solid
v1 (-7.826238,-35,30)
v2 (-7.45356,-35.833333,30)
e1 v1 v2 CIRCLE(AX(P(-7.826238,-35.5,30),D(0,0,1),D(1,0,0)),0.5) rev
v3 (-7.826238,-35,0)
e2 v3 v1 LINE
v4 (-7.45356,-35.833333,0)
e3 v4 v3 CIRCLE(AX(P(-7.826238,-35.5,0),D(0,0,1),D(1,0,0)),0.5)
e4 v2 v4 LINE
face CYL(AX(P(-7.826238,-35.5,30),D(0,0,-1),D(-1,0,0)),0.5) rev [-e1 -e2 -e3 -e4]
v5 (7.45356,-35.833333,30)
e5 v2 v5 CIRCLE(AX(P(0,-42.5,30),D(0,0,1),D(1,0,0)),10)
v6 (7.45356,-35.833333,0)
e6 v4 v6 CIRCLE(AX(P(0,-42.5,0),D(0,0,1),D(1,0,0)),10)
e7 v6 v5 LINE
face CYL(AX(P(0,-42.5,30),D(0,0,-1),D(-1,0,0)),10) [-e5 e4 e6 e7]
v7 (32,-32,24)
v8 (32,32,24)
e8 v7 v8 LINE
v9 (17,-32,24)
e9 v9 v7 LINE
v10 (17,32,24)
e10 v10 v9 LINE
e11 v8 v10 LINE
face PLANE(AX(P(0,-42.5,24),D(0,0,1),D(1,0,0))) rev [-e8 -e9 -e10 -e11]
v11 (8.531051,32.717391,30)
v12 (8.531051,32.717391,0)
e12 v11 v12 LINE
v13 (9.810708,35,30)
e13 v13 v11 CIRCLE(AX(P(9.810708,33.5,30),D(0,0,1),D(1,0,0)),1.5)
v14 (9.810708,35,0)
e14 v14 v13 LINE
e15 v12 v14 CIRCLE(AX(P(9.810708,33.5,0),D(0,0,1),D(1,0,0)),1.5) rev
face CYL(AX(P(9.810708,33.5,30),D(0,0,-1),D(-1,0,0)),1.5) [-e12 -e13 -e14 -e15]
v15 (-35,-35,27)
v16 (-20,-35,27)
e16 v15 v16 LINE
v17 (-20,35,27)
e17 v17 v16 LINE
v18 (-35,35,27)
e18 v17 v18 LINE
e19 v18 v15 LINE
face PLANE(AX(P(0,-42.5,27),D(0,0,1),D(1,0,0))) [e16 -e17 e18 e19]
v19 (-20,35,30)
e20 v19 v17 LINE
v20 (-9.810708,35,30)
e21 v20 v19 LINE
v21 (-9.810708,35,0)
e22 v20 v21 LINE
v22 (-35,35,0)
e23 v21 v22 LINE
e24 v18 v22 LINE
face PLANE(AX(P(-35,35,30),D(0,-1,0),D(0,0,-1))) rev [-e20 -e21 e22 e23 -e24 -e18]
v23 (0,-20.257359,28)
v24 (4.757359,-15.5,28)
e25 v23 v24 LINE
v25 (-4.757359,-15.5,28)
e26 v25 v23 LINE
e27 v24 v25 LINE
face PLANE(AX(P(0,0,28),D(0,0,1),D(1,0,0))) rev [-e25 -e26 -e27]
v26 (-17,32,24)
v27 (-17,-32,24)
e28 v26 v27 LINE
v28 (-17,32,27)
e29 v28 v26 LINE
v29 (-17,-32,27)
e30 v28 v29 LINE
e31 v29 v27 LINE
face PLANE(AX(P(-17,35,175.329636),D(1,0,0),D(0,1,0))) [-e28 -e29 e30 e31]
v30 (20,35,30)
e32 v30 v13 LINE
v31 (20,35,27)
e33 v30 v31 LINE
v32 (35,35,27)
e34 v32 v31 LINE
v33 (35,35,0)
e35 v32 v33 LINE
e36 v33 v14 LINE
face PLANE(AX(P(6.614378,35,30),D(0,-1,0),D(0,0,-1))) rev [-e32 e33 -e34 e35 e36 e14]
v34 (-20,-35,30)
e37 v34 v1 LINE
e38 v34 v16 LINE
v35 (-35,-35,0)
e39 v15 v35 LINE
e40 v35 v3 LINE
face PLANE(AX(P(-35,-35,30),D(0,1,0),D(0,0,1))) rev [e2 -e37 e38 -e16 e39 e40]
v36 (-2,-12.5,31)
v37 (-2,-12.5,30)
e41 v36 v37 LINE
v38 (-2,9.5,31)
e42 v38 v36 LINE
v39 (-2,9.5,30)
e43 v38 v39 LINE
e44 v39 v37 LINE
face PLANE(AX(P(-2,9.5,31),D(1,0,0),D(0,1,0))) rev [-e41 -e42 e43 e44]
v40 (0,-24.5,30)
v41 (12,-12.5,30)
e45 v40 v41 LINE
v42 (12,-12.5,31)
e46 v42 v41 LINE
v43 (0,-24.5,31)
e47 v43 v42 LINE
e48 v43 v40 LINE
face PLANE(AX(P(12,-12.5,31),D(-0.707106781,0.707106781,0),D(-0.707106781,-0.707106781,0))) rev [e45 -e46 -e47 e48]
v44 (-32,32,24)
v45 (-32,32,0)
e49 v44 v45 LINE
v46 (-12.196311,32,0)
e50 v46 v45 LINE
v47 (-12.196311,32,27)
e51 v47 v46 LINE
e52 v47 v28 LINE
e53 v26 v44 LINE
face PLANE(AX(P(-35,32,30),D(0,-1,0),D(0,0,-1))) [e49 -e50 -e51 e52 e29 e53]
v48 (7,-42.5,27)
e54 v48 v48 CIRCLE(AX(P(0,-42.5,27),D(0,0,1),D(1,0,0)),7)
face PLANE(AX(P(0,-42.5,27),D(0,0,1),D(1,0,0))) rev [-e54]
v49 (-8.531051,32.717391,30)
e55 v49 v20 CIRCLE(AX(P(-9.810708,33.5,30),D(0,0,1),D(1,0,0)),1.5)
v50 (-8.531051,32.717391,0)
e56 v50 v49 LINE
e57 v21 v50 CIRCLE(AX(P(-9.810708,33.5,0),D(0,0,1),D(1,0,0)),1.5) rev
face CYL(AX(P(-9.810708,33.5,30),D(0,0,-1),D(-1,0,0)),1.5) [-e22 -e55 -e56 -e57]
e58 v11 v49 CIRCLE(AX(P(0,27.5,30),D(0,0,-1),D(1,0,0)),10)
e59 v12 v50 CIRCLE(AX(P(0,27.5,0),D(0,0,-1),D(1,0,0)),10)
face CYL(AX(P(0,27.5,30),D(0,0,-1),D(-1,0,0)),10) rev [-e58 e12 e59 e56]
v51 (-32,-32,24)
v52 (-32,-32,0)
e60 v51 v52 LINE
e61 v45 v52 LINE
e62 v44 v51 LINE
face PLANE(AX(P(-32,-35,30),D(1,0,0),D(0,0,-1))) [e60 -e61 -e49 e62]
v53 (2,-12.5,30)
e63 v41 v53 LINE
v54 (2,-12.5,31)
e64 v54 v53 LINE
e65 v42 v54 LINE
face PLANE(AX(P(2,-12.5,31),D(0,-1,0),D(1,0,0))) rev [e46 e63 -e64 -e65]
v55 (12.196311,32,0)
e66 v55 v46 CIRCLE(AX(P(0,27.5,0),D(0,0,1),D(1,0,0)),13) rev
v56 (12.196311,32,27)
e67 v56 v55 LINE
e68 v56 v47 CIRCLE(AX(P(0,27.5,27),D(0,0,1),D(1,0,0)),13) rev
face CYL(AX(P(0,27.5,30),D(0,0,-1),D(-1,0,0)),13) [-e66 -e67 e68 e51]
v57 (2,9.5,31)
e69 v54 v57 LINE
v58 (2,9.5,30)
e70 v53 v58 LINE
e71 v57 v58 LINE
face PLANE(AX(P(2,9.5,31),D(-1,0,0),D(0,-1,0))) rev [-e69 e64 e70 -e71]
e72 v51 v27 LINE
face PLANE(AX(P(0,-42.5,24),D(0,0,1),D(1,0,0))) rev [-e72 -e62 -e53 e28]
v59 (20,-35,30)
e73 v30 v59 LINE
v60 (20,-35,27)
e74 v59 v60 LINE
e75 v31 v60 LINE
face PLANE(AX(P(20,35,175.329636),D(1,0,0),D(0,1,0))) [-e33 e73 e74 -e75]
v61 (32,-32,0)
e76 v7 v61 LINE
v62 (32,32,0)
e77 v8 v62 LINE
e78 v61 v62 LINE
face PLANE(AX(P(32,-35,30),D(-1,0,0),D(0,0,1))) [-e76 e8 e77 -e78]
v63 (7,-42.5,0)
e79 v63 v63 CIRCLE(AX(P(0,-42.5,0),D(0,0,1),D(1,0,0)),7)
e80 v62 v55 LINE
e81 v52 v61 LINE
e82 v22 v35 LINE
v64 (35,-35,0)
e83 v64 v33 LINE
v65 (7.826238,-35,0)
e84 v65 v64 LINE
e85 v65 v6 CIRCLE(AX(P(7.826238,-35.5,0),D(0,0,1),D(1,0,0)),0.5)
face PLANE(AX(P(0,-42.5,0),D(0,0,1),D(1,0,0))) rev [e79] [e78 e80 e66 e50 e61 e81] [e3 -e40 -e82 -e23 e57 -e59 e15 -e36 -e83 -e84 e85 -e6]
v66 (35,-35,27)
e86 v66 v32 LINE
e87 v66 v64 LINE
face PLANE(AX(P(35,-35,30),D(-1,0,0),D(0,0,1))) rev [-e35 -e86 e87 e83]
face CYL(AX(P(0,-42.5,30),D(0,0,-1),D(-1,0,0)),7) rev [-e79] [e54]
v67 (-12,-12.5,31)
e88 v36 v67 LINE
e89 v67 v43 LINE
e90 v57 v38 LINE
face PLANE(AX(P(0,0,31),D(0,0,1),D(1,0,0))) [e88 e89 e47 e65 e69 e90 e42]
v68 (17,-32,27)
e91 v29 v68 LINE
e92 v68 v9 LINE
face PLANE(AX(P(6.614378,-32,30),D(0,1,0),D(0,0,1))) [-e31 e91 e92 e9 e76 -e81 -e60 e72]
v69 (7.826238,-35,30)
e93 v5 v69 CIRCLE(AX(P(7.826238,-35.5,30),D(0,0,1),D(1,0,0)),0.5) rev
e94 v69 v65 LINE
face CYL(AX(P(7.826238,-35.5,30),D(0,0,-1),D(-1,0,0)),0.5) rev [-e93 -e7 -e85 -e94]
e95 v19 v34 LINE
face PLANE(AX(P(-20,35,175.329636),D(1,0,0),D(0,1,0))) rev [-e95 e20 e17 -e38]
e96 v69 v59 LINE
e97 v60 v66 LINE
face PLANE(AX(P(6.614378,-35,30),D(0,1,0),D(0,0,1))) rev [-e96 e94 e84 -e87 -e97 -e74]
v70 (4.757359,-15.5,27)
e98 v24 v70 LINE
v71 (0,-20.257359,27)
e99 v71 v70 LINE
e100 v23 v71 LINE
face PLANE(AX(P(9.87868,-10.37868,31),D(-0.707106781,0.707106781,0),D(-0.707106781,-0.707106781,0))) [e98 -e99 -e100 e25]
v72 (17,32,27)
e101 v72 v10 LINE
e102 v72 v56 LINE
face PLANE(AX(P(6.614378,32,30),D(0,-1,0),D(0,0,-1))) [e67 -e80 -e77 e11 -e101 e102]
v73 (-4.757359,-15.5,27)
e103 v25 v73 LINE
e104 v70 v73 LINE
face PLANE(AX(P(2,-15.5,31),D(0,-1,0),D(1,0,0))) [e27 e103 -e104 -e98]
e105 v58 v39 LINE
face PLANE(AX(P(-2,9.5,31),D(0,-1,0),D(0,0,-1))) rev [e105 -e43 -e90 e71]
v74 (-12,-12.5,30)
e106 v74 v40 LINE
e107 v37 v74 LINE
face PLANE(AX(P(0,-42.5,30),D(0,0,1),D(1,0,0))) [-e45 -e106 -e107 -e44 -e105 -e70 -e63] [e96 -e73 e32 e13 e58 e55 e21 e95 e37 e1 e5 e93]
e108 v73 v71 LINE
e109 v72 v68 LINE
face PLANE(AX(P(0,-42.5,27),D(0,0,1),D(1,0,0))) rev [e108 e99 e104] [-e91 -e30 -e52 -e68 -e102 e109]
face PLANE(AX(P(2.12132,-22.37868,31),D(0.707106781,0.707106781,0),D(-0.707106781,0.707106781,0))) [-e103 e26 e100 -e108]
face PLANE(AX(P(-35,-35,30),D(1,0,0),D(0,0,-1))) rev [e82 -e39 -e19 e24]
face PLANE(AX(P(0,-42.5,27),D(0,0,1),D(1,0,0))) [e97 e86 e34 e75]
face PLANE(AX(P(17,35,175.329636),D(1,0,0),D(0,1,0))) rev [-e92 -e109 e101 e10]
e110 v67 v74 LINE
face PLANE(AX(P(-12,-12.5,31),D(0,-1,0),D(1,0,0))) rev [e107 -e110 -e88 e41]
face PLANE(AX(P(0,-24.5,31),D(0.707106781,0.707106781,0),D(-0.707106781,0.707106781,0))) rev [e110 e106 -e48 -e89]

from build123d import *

# Parameters (mm, degrees)
BOSS_EXTRU_1_DEPTH           = 30
BOSS_EXTRU_2_DEPTH           = 1
ENL_V_MAT_EXTRU_2_DEPTH      = 70.865943062
ENL_V_MAT_EXTRU_2_DEPTH_BACK = 3
ENL_V_MAT_EXTRU_3_DEPTH      = 70.865943062
ENL_V_MAT_EXTRU_3_DEPTH_BACK = 3
COQUE3_OUTLINE_R             = 7
COQUE3_DEPTH                 = 24
COQUE3_START                 = 24
COQUE3_2_OUTLINE_R           = 7
COQUE3_2_DEPTH               = 3
COQUE3_START_2               = 27
COQUE3_3_DEPTH               = 1
CONG_1_R                     = 0.5
CONG_2_R                     = 1.5


# Read off the part's stored shape, not the designer's step: Coque3
with BuildPart() as part:
    # Esquisse1 → Boss.-Extru.1 (new body)
    with BuildSketch(Plane.XY):
        with BuildLine():
            Line((-35, -35), (-6.614378278, -35))
            ThreePointArc((-6.614378278, -35), (0, -52.5), (6.614378278, -35))
            Line((6.614378278, -35), (35, -35))
            Line((35, -35), (35, 35))
            Line((35, 35), (6.614378278, 35))
            ThreePointArc((6.614378278, 35), (0, 17.5), (-6.614378278, 35))
            Line((-6.614378278, 35), (-35, 35))
            Line((-35, 35), (-35, -35))
        make_face()
    extrude(amount=BOSS_EXTRU_1_DEPTH)

    # Esquisse4 → Boss.-Extru.2 (add)
    with BuildSketch(Plane.XY.offset(30)):
        Polygon((0, -24.5), (-12, -12.5), (-2, -12.5), (-2, 9.5), (2, 9.5), (2, -12.5), (12, -12.5), align=None)
    extrude(amount=BOSS_EXTRU_2_DEPTH)

    # Esquisse5 → Enlèv. mat.-Extru.2 (cut, two sides: drawn at the far end of the back side and taken through both)
    with BuildSketch(Plane.XY.offset(30).offset(-ENL_V_MAT_EXTRU_2_DEPTH_BACK)):
        Polygon((20, 251.700266086), (20, 35), (20, -35), (20, -251.700266086), (453.400532172, -251.700266086), (453.400532172, 251.700266086), align=None)
    extrude(amount=ENL_V_MAT_EXTRU_2_DEPTH + ENL_V_MAT_EXTRU_2_DEPTH_BACK, mode=Mode.SUBTRACT)

    # Esquisse6 → Enlèv. mat.-Extru.3 (cut, two sides: drawn at the far end of the back side and taken through both)
    with BuildSketch(Plane.XY.offset(30).offset(-ENL_V_MAT_EXTRU_3_DEPTH_BACK)):
        Polygon((-20, 251.700266086), (-20, 35), (-20, -35), (-20, -251.700266086), (-453.400532172, -251.700266086), (-453.400532172, 251.700266086), align=None)
    extrude(amount=ENL_V_MAT_EXTRU_3_DEPTH + ENL_V_MAT_EXTRU_3_DEPTH_BACK, mode=Mode.SUBTRACT)

    # Coque3 outline → Coque3 (cut)
    with BuildSketch(Plane.XY):
        with Locations((0, -42.5)):
            Circle(COQUE3_OUTLINE_R)
        with BuildLine():
            Line((-32, -32), (32, -32))
            Line((32, -32), (32, 32))
            Line((32, 32), (12.196310918, 32))
            ThreePointArc((12.196310918, 32), (0, 14.5), (-12.196310918, 32))
            Line((-12.196310918, 32), (-32, 32))
            Line((-32, 32), (-32, -32))
        make_face()
    extrude(amount=COQUE3_DEPTH, mode=Mode.SUBTRACT)

    # Coque3 2 outline → Coque3 2 (cut)
    with BuildSketch(Plane.XY.offset(COQUE3_START)):
        with Locations((0, -42.5)):
            Circle(COQUE3_2_OUTLINE_R)
        with BuildLine():
            Line((-17, 32), (-17, -32))
            Line((-17, -32), (17, -32))
            Line((17, -32), (17, 32))
            Line((17, 32), (12.196310918, 32))
            ThreePointArc((12.196310918, 32), (0, 14.5), (-12.196310918, 32))
            Line((-12.196310918, 32), (-17, 32))
        make_face()
    extrude(amount=COQUE3_2_DEPTH, mode=Mode.SUBTRACT)

    # Coque3 3 outline → Coque3 3 (cut)
    with BuildSketch(Plane.XY.offset(COQUE3_START_2)):
        Polygon((4.757359313, -15.5), (-4.757359313, -15.5), (0, -20.257359313), align=None)
    extrude(amount=COQUE3_3_DEPTH, mode=Mode.SUBTRACT)

    # Congé1
    cong_1_edges = [part.edges().sort_by_distance(p)[0] for p in [
        (6.614378278, -35, 15),
        (-6.614378278, -35, 15),
    ]]
    fillet(cong_1_edges, radius=CONG_1_R)

    # Congé2
    cong_2_edges = [part.edges().sort_by_distance(p)[0] for p in [
        (-6.614378278, 35, 15),
        (6.614378278, 35, 15),
    ]]
    fillet(cong_2_edges, radius=CONG_2_R)


solid = part.part
